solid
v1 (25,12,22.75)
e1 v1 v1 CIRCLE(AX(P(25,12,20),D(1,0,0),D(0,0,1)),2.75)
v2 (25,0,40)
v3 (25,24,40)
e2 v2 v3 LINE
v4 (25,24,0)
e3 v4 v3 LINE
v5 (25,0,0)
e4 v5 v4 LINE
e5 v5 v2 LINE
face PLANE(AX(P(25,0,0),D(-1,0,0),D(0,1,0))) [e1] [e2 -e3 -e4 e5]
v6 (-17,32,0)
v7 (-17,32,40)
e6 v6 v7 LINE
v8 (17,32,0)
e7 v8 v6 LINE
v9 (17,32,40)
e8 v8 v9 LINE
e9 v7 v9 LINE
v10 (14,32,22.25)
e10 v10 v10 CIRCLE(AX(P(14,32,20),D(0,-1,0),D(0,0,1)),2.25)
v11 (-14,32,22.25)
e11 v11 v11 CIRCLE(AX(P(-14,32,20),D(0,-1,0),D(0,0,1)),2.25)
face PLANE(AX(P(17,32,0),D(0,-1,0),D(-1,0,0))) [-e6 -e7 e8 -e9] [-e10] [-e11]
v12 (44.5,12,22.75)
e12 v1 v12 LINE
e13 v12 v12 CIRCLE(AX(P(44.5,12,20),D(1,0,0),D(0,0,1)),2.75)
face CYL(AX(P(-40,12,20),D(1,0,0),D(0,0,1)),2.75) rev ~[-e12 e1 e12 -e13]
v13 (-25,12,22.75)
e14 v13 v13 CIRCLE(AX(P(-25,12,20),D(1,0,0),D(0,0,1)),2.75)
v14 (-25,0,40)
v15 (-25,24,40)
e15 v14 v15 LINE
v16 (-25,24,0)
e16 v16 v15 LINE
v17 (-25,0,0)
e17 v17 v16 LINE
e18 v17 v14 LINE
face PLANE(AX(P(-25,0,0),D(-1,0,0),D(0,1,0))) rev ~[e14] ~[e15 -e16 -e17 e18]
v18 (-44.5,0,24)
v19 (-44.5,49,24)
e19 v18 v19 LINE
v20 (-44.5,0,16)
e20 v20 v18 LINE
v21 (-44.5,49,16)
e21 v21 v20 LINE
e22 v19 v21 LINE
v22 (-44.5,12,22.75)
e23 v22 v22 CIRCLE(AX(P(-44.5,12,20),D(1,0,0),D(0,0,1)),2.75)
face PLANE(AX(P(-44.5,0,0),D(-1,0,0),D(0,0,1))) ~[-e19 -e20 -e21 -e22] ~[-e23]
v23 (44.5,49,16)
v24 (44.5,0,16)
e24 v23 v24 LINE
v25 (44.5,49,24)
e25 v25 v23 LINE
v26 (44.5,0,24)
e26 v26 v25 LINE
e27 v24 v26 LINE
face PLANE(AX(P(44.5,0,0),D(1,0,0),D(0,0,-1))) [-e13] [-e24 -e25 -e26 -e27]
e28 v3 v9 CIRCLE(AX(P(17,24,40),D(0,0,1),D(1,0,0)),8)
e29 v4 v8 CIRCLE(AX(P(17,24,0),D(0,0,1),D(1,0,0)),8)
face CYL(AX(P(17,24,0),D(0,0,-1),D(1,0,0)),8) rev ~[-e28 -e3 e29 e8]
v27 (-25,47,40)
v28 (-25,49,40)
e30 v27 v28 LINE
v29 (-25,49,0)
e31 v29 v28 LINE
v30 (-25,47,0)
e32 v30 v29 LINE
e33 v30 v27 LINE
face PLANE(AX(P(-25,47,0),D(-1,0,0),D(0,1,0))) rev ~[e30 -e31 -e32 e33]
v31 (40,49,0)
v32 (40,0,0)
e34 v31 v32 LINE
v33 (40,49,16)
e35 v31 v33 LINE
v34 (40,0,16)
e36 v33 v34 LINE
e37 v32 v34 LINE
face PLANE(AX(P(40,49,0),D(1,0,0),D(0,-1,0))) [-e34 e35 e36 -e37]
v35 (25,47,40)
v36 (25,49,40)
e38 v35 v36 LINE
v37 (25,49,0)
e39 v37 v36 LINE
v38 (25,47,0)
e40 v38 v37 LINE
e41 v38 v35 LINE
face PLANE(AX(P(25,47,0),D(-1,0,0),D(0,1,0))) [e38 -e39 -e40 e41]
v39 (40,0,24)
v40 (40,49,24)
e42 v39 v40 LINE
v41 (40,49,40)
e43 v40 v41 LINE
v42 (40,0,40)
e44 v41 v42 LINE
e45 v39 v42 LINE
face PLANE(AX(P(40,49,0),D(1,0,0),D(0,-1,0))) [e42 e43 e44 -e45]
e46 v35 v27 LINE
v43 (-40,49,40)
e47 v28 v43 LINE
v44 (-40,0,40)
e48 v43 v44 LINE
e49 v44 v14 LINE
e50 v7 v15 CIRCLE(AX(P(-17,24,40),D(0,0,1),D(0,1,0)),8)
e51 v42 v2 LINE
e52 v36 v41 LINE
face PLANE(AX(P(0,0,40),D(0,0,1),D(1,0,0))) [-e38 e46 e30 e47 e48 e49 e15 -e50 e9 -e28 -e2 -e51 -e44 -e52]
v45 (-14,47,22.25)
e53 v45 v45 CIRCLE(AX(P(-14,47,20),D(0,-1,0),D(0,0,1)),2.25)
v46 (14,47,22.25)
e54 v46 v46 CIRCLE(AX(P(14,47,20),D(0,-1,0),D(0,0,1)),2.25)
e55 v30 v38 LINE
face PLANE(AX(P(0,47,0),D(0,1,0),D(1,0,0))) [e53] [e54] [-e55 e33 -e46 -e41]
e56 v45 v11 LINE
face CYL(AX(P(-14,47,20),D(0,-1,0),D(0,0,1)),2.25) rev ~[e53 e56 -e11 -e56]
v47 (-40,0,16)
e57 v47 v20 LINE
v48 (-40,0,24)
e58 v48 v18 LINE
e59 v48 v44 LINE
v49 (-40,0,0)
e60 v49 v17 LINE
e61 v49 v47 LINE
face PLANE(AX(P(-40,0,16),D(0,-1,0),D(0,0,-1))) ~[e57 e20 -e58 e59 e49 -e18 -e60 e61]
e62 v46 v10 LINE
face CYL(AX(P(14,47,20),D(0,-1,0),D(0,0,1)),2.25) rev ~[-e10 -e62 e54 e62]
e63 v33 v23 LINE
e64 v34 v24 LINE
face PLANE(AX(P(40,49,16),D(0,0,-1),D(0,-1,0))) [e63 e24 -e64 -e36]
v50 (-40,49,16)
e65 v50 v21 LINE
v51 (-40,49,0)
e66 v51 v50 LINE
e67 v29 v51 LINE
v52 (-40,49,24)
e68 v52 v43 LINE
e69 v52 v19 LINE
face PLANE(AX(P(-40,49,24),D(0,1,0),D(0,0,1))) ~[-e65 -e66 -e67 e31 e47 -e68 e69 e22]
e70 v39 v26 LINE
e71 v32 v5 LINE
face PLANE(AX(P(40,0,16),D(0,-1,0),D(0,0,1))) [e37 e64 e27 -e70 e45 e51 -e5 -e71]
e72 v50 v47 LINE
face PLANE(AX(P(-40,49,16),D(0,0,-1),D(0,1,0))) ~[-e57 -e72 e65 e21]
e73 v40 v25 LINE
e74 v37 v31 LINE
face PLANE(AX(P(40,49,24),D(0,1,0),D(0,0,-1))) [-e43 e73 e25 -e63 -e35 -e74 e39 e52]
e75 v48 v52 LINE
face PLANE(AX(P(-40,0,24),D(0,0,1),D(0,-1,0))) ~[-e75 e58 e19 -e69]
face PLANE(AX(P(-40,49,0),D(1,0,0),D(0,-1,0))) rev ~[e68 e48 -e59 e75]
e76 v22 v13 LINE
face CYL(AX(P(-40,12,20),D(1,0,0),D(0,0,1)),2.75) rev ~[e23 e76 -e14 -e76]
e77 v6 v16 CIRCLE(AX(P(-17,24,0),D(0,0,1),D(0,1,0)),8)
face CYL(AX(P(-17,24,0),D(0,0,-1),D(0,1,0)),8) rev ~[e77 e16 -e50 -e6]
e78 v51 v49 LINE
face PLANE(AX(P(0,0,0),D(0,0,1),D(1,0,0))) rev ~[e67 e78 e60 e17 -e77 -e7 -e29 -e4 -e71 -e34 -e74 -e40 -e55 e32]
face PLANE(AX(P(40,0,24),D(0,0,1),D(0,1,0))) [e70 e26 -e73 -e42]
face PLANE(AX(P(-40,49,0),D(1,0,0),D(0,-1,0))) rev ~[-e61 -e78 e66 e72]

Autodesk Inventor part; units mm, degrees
ref_plane "YZ Plane" through (0, 0, 0) normal (1, 0, 0) x (0, 1, 0)
ref_plane "XZ Plane" through (0, 0, 0) normal (0, 1, 0) x (-1, 0, 0)
ref_plane "XY Plane" through (0, 0, 0) normal (0, 0, 1) x (1, 0, 0)
sketch "Skizze1" plane through (0, 0, 0) normal (0, 0, 1) x (1, 0, 0)
  line L0 (25, 49) -> (40, 49)
  line L1 (40, 49) -> (40, 0)
  line L2 (40, 0) -> (25, 0)
  line L3 (25, 0) -> (25, 24)
  line L4 (17, 32) -> (0, 32)
  line L5 (0, 32) -> (0, 0) construction
  line L6 (0, -9.8) -> (0, 58.8) construction
  line L7 (-56, 0) -> (56, 0) construction
  line L8 (0, 47) -> (25, 47)
  line L9 (25, 47) -> (25, 49)
  arc A0 (25, 24) -> (17, 32) centre (17, 24) ccw
  line L10 (25, 12) -> (40, 12) construction
  line L11 (-25, 49) -> (-40, 49)
  line L12 (-40, 49) -> (-40, 0)
  line L13 (-40, 0) -> (-25, 0)
  line L14 (-25, 0) -> (-25, 24)
  line L15 (-17, 32) -> (0, 32)
  line L16 (0, 47) -> (-25, 47)
  line L17 (-25, 47) -> (-25, 49)
  arc A1 (-17, 32) -> (-25, 24) centre (-17, 24) ccw
  line L18 (-25, 12) -> (-40, 12) construction
  line L19 (25, 14.5) -> (40, 14.5) construction
  line L20 (40, 14.5) -> (40, 9.5) construction
  line L21 (40, 9.5) -> (25, 9.5) construction
  line L22 (25, 9.5) -> (25, 14.5) construction
  dimension "d0" = 15
  dimension "d1" = 2
  dimension "d2" = 80
  dimension "d4" = 50
  dimension "d5" = 8
  dimension "d6" = 12
  dimension "d7" = 15
  dimension "d8" = 5
extrude "Extrusion1" add sketch "Skizze1" along normal blind 40
sketch "Skizze2" plane through (-25, 47, 0) normal (0, 1, 0) x (1, 0, 0)
  line L0 (50, 0) -> (0, 0) construction
  line L1 (0, 0) -> (0, -40) construction
  line L2 (50, -40) -> (0, -40) construction
  line L3 (50, 0) -> (50, -40) construction
  line L4 (0, 0) -> (0, -40) construction
  line L5 (0, -20) -> (50, -20) construction
  line L6 (50, 0) -> (50, -40) construction
  line L7 (25, -20) -> (25, -40) construction
  line L8 (50, -40) -> (0, -40) construction
  point P0 (25, 0)
  point P1 (11, -20)
  point P2 (39, -20)
  dimension "d11" = 14
  dimension "d12" = 14
hole "Bohrung1" at (-14, 47, 20) at (14, 47, 20) direction (0, -1, 0) diameter 4.5 end through all clearance for "Sechskantkopfschraube DIN EN 24017" size "M4" standard "DIN"
sketch "Skizze3" plane through (-40, 0, 0) normal (-1, 0, 0) x (0, 0, 1)
  line L0 (0, 24) -> (0, 0) construction
  line L1 (0, 0) -> (40, 0) construction
  line L2 (40, 24) -> (40, 0) construction
  line L3 (0, 24) -> (40, 24) construction
  line L4 (0, 24) -> (40, 24) construction
  line L5 (20, 24) -> (20, 12) construction
  line L6 (20, 12) -> (40, 12) construction
  point P0 (0, 0)
hole "Bohrung2" at (-40, 12, 20) direction (1, 0, 0) diameter 5.5 end through all clearance for "Sechskantkopfschraube DIN EN 24017" size "M5" standard "DIN"
sketch "Skizze4" plane through (40, 0, 0) normal (1, 0, 0) x (0, 0, -1)
  circle A0 centre (-20, 12) radius 2.75 construction
  line L0 (0, 0) -> (0, 49) construction
  line L1 (0, 49) -> (-40, 49) construction
  line L2 (-40, 0) -> (-40, 49) construction
  line L3 (0, 0) -> (-40, 0) construction
  line L4 (0, 0) -> (-40, 0) construction
  line L5 (-20, 0) -> (-20, 49) construction
  line L6 (-24, 49) -> (-16, 49)
  line L7 (-16, 49) -> (-16, 0)
  line L8 (-16, 0) -> (-24, 0)
  line L9 (-24, 0) -> (-24, 49)
  line L10 (-24, 49) -> (-16, 0) construction
  line L11 (-16, 49) -> (-24, 0) construction
  point P0 (-20, 24.5)
  dimension "d28" = 8
extrude "Extrusion2" add sketch "Skizze4" along normal blind 4.5
ref_plane "Arbeitsebene1" through (0, 0, 0) normal (-1, 0, 0) x (0, 0, 1)
mirror "Spiegeln1" about plane through (0, 0, 0) normal (-1, 0, 0) of "Extrusion2"
delete faces "Fläche löschen1" heal yes whole lump no faces at (40, 10.7843, 19.0833)
delete faces "Fläche löschen2" heal yes whole lump no faces at (-40, 12.2194, 20.89)
equation "\"d2\" = Motor_Frame_FixationPlate_Width"
equation "\"d4\" = Fixation_Width"
equation "\"d9\" = Fixation_Thickness"
equation "\"d11\" = 0.5 * FixationHole_Dist"
equation "\"d12\" = d11"
equation "\"Motor_Frame_FixationPlate_Width\" = 80"
equation "\"Fixation_Width\" = 50"
equation "\"Fixation_Thickness\" = 40"
equation "\"FixationHole_Dist\" = 28"
properties part number "Motor_MainAxis_Frame_Fixation" material "PBT-Kunststoff"
